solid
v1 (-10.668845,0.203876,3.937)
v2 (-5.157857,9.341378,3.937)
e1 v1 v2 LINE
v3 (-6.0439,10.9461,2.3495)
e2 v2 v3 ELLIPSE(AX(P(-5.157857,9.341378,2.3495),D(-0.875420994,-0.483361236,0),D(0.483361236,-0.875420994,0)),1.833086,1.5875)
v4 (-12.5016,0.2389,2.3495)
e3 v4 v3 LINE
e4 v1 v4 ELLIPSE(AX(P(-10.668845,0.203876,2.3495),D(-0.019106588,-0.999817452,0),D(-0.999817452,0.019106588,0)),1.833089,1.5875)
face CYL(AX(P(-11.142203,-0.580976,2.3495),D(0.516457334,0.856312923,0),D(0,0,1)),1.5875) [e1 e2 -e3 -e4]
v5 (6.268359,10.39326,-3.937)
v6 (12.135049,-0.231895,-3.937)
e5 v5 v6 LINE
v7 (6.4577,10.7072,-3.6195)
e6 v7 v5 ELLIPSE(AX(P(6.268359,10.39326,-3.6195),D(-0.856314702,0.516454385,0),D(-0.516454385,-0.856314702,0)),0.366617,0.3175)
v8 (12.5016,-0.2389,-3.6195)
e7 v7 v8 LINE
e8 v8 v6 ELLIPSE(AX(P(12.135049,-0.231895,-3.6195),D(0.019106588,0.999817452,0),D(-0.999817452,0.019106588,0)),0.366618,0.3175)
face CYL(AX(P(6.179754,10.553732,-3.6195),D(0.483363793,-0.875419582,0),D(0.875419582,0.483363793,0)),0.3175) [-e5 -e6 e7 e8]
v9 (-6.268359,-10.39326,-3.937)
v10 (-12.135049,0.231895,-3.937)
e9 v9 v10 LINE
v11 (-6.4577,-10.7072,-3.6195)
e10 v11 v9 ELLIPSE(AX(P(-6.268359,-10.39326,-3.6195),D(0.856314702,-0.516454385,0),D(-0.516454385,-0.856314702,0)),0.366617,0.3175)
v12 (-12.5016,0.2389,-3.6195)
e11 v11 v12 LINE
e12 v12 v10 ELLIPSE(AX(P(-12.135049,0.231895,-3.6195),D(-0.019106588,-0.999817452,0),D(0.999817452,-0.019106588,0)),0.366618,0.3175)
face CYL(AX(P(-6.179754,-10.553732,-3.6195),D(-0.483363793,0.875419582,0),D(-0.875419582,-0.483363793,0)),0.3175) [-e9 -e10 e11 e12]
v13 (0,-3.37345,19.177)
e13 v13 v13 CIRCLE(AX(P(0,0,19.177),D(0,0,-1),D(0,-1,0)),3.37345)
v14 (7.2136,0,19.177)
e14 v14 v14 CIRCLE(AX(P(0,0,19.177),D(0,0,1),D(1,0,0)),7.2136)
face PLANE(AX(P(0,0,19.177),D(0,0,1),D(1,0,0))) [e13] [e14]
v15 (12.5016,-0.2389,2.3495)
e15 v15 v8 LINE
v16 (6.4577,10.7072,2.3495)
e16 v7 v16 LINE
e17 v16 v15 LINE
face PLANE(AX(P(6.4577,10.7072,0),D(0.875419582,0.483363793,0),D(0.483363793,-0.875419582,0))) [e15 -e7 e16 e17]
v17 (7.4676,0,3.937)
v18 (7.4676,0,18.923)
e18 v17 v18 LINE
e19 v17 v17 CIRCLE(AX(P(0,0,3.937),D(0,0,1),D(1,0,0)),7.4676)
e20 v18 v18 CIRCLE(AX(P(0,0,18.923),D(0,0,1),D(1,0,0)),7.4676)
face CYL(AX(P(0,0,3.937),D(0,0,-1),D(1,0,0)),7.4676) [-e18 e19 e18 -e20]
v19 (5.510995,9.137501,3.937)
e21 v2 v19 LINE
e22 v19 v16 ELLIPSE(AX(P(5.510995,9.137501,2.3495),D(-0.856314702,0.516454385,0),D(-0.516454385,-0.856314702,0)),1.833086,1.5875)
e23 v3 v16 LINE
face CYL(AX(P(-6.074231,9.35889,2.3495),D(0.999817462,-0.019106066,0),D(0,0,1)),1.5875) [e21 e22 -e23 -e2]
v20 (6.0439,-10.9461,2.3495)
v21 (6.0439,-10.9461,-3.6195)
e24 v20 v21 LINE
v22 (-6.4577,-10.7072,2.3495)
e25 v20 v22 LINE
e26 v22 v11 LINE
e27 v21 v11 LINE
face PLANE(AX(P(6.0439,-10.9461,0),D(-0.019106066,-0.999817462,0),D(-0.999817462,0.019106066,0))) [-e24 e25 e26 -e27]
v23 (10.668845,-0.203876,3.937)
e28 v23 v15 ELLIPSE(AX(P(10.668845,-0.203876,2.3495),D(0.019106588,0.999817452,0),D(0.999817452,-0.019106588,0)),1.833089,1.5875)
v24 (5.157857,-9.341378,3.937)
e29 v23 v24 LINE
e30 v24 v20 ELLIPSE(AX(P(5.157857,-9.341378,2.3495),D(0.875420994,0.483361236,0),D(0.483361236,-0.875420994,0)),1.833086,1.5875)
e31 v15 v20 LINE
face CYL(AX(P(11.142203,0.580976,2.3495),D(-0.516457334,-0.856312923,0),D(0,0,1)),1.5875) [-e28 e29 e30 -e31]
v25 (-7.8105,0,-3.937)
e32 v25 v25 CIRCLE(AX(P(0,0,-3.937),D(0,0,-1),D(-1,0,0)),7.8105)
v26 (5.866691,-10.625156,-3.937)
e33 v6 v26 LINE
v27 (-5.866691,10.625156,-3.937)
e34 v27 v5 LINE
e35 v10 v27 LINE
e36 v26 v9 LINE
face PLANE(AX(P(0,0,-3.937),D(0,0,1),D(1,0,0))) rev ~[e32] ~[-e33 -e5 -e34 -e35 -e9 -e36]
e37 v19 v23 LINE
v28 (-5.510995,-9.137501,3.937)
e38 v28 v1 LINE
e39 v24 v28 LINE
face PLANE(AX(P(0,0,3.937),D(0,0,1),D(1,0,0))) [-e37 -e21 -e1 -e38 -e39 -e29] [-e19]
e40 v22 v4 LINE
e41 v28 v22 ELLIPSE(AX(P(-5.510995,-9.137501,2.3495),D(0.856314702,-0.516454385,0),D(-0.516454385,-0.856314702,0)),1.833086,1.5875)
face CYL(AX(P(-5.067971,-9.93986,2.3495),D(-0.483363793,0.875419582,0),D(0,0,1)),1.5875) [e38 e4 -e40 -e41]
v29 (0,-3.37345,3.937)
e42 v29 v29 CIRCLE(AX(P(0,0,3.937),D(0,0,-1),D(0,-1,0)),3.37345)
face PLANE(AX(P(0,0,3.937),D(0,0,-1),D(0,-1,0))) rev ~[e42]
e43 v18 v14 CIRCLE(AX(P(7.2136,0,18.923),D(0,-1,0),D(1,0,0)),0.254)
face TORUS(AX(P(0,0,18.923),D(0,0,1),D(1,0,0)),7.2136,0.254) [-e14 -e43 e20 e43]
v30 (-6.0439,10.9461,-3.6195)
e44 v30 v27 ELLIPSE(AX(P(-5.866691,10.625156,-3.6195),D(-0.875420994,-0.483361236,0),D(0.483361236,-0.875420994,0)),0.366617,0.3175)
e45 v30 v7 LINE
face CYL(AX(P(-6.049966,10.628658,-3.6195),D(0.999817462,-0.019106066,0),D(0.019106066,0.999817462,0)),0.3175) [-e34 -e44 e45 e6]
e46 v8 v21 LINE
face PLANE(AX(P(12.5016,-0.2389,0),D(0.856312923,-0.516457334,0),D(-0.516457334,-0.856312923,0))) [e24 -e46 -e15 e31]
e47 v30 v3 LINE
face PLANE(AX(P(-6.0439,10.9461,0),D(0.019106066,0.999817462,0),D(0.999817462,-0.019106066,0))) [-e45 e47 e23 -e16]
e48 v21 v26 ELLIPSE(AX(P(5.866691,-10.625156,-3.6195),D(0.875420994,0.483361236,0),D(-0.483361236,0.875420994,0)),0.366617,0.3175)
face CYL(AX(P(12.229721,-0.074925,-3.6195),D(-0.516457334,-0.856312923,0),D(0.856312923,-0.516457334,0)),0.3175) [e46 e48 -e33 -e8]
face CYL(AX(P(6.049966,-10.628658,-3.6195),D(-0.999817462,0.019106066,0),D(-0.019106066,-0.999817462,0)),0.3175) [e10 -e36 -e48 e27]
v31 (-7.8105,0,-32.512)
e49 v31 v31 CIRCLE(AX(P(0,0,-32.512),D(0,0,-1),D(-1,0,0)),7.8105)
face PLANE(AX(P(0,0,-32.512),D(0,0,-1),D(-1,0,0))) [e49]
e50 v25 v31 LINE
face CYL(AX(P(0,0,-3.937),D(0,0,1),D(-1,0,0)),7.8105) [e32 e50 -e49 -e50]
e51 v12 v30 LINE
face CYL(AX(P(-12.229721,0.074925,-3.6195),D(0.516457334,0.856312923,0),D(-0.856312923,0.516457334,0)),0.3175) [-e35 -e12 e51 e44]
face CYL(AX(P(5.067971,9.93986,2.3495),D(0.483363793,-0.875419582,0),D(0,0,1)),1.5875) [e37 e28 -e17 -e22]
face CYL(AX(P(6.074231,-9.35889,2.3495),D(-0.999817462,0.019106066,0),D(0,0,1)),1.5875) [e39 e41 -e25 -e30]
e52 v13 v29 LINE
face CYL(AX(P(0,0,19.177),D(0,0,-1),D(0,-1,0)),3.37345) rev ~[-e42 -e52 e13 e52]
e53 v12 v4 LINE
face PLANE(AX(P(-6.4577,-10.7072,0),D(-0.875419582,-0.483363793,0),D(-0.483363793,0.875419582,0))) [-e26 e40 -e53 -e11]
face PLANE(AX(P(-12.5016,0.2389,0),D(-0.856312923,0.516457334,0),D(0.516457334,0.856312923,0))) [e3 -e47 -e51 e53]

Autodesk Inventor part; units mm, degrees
ref_plane "YZ Plane" through (0, 0, 0) normal (1, 0, 0) x (0, 1, 0)
ref_plane "XZ Plane" through (0, 0, 0) normal (0, 1, 0) x (-1, 0, 0)
ref_plane "XY Plane" through (0, 0, 0) normal (0, 0, 1) x (1, 0, 0)
sketch "Sketch1" plane through (0, 0, 0) normal (0, 0, 1) x (1, 0, 0)
  line L0 (6.4577, 10.7072) -> (12.5016, -0.2389)
  line L1 (12.5016, -0.2389) -> (6.0439, -10.9461)
  line L2 (6.0439, -10.9461) -> (-6.4577, -10.7072)
  line L3 (-6.4577, -10.7072) -> (-12.5016, 0.2389)
  line L4 (-12.5016, 0.2389) -> (-6.0439, 10.9461)
  line L5 (-6.0439, 10.9461) -> (6.4577, 10.7072)
  point P0 (0, 0)
  point P1 (0, 0)
  dimension "d0" = 25.0031
extrude "Extrusion1" add sketch "Sketch1" along normal mid plane 7.874
sketch "Sketch2" plane through (0, 0, 3.937) normal (0, 0, 1) x (1, 0, 0)
  circle A0 centre (0, 0) radius 7.4676
  dimension "d3" = 14.9352
extrude "Extrusion2" add sketch "Sketch2" along normal blind 15.24
fillet "Fillet1" radius 0.254 1 edges at (-7.4676, 0, 19.177)
sketch "Sketch3" plane through (0, 0, 19.177) normal (0, 0, 1) x (1, 0, 0)
  point P0 (0, 0)
  point P1 (0, 0)
hole "Hole1" at (0, 0, 19.177) at (0, 0, 19.177) direction (0, 0, -1) diameter 6.7469 depth 15.24
sketch "Sketch4" plane through (0, 0, -3.937) normal (0, 0, -1) x (-1, 0, 0)
  circle A0 centre (0, 0) radius 7.8105
  dimension "d15" = 15.621
extrude "Extrusion3" add sketch "Sketch4" along normal blind 28.575
thread "Thread1" size "5/8-11 UNC" class "2A" standard "ANSI Unified Screw Threads" length 19.05
thread "Thread2" size "10-24 UNC" class "2B" standard "ANSI Unified Screw Threads" length 25.4
fillet "Fillet2" radius 1.5875 6 edges at (9.4796, 5.2342, 3.937) (0.2069, 10.8267, 3.937) (9.2727, -5.5925, 3.937) (-0.2069, -10.8267, 3.937) (-9.4796, -5.2342, 3.937) (-9.2727, 5.5925, 3.937)
fillet "Fillet3" radius 0.3175 6 edges at (-0.2069, -10.8267, -3.937) (9.2727, -5.5925, -3.937) (9.4796, 5.2342, -3.937) (0.2069, 10.8267, -3.937) (-9.2727, 5.5925, -3.937) (-9.4796, -5.2342, -3.937)
properties part number "Double Sided Bolt" material "Stainless Steel"
